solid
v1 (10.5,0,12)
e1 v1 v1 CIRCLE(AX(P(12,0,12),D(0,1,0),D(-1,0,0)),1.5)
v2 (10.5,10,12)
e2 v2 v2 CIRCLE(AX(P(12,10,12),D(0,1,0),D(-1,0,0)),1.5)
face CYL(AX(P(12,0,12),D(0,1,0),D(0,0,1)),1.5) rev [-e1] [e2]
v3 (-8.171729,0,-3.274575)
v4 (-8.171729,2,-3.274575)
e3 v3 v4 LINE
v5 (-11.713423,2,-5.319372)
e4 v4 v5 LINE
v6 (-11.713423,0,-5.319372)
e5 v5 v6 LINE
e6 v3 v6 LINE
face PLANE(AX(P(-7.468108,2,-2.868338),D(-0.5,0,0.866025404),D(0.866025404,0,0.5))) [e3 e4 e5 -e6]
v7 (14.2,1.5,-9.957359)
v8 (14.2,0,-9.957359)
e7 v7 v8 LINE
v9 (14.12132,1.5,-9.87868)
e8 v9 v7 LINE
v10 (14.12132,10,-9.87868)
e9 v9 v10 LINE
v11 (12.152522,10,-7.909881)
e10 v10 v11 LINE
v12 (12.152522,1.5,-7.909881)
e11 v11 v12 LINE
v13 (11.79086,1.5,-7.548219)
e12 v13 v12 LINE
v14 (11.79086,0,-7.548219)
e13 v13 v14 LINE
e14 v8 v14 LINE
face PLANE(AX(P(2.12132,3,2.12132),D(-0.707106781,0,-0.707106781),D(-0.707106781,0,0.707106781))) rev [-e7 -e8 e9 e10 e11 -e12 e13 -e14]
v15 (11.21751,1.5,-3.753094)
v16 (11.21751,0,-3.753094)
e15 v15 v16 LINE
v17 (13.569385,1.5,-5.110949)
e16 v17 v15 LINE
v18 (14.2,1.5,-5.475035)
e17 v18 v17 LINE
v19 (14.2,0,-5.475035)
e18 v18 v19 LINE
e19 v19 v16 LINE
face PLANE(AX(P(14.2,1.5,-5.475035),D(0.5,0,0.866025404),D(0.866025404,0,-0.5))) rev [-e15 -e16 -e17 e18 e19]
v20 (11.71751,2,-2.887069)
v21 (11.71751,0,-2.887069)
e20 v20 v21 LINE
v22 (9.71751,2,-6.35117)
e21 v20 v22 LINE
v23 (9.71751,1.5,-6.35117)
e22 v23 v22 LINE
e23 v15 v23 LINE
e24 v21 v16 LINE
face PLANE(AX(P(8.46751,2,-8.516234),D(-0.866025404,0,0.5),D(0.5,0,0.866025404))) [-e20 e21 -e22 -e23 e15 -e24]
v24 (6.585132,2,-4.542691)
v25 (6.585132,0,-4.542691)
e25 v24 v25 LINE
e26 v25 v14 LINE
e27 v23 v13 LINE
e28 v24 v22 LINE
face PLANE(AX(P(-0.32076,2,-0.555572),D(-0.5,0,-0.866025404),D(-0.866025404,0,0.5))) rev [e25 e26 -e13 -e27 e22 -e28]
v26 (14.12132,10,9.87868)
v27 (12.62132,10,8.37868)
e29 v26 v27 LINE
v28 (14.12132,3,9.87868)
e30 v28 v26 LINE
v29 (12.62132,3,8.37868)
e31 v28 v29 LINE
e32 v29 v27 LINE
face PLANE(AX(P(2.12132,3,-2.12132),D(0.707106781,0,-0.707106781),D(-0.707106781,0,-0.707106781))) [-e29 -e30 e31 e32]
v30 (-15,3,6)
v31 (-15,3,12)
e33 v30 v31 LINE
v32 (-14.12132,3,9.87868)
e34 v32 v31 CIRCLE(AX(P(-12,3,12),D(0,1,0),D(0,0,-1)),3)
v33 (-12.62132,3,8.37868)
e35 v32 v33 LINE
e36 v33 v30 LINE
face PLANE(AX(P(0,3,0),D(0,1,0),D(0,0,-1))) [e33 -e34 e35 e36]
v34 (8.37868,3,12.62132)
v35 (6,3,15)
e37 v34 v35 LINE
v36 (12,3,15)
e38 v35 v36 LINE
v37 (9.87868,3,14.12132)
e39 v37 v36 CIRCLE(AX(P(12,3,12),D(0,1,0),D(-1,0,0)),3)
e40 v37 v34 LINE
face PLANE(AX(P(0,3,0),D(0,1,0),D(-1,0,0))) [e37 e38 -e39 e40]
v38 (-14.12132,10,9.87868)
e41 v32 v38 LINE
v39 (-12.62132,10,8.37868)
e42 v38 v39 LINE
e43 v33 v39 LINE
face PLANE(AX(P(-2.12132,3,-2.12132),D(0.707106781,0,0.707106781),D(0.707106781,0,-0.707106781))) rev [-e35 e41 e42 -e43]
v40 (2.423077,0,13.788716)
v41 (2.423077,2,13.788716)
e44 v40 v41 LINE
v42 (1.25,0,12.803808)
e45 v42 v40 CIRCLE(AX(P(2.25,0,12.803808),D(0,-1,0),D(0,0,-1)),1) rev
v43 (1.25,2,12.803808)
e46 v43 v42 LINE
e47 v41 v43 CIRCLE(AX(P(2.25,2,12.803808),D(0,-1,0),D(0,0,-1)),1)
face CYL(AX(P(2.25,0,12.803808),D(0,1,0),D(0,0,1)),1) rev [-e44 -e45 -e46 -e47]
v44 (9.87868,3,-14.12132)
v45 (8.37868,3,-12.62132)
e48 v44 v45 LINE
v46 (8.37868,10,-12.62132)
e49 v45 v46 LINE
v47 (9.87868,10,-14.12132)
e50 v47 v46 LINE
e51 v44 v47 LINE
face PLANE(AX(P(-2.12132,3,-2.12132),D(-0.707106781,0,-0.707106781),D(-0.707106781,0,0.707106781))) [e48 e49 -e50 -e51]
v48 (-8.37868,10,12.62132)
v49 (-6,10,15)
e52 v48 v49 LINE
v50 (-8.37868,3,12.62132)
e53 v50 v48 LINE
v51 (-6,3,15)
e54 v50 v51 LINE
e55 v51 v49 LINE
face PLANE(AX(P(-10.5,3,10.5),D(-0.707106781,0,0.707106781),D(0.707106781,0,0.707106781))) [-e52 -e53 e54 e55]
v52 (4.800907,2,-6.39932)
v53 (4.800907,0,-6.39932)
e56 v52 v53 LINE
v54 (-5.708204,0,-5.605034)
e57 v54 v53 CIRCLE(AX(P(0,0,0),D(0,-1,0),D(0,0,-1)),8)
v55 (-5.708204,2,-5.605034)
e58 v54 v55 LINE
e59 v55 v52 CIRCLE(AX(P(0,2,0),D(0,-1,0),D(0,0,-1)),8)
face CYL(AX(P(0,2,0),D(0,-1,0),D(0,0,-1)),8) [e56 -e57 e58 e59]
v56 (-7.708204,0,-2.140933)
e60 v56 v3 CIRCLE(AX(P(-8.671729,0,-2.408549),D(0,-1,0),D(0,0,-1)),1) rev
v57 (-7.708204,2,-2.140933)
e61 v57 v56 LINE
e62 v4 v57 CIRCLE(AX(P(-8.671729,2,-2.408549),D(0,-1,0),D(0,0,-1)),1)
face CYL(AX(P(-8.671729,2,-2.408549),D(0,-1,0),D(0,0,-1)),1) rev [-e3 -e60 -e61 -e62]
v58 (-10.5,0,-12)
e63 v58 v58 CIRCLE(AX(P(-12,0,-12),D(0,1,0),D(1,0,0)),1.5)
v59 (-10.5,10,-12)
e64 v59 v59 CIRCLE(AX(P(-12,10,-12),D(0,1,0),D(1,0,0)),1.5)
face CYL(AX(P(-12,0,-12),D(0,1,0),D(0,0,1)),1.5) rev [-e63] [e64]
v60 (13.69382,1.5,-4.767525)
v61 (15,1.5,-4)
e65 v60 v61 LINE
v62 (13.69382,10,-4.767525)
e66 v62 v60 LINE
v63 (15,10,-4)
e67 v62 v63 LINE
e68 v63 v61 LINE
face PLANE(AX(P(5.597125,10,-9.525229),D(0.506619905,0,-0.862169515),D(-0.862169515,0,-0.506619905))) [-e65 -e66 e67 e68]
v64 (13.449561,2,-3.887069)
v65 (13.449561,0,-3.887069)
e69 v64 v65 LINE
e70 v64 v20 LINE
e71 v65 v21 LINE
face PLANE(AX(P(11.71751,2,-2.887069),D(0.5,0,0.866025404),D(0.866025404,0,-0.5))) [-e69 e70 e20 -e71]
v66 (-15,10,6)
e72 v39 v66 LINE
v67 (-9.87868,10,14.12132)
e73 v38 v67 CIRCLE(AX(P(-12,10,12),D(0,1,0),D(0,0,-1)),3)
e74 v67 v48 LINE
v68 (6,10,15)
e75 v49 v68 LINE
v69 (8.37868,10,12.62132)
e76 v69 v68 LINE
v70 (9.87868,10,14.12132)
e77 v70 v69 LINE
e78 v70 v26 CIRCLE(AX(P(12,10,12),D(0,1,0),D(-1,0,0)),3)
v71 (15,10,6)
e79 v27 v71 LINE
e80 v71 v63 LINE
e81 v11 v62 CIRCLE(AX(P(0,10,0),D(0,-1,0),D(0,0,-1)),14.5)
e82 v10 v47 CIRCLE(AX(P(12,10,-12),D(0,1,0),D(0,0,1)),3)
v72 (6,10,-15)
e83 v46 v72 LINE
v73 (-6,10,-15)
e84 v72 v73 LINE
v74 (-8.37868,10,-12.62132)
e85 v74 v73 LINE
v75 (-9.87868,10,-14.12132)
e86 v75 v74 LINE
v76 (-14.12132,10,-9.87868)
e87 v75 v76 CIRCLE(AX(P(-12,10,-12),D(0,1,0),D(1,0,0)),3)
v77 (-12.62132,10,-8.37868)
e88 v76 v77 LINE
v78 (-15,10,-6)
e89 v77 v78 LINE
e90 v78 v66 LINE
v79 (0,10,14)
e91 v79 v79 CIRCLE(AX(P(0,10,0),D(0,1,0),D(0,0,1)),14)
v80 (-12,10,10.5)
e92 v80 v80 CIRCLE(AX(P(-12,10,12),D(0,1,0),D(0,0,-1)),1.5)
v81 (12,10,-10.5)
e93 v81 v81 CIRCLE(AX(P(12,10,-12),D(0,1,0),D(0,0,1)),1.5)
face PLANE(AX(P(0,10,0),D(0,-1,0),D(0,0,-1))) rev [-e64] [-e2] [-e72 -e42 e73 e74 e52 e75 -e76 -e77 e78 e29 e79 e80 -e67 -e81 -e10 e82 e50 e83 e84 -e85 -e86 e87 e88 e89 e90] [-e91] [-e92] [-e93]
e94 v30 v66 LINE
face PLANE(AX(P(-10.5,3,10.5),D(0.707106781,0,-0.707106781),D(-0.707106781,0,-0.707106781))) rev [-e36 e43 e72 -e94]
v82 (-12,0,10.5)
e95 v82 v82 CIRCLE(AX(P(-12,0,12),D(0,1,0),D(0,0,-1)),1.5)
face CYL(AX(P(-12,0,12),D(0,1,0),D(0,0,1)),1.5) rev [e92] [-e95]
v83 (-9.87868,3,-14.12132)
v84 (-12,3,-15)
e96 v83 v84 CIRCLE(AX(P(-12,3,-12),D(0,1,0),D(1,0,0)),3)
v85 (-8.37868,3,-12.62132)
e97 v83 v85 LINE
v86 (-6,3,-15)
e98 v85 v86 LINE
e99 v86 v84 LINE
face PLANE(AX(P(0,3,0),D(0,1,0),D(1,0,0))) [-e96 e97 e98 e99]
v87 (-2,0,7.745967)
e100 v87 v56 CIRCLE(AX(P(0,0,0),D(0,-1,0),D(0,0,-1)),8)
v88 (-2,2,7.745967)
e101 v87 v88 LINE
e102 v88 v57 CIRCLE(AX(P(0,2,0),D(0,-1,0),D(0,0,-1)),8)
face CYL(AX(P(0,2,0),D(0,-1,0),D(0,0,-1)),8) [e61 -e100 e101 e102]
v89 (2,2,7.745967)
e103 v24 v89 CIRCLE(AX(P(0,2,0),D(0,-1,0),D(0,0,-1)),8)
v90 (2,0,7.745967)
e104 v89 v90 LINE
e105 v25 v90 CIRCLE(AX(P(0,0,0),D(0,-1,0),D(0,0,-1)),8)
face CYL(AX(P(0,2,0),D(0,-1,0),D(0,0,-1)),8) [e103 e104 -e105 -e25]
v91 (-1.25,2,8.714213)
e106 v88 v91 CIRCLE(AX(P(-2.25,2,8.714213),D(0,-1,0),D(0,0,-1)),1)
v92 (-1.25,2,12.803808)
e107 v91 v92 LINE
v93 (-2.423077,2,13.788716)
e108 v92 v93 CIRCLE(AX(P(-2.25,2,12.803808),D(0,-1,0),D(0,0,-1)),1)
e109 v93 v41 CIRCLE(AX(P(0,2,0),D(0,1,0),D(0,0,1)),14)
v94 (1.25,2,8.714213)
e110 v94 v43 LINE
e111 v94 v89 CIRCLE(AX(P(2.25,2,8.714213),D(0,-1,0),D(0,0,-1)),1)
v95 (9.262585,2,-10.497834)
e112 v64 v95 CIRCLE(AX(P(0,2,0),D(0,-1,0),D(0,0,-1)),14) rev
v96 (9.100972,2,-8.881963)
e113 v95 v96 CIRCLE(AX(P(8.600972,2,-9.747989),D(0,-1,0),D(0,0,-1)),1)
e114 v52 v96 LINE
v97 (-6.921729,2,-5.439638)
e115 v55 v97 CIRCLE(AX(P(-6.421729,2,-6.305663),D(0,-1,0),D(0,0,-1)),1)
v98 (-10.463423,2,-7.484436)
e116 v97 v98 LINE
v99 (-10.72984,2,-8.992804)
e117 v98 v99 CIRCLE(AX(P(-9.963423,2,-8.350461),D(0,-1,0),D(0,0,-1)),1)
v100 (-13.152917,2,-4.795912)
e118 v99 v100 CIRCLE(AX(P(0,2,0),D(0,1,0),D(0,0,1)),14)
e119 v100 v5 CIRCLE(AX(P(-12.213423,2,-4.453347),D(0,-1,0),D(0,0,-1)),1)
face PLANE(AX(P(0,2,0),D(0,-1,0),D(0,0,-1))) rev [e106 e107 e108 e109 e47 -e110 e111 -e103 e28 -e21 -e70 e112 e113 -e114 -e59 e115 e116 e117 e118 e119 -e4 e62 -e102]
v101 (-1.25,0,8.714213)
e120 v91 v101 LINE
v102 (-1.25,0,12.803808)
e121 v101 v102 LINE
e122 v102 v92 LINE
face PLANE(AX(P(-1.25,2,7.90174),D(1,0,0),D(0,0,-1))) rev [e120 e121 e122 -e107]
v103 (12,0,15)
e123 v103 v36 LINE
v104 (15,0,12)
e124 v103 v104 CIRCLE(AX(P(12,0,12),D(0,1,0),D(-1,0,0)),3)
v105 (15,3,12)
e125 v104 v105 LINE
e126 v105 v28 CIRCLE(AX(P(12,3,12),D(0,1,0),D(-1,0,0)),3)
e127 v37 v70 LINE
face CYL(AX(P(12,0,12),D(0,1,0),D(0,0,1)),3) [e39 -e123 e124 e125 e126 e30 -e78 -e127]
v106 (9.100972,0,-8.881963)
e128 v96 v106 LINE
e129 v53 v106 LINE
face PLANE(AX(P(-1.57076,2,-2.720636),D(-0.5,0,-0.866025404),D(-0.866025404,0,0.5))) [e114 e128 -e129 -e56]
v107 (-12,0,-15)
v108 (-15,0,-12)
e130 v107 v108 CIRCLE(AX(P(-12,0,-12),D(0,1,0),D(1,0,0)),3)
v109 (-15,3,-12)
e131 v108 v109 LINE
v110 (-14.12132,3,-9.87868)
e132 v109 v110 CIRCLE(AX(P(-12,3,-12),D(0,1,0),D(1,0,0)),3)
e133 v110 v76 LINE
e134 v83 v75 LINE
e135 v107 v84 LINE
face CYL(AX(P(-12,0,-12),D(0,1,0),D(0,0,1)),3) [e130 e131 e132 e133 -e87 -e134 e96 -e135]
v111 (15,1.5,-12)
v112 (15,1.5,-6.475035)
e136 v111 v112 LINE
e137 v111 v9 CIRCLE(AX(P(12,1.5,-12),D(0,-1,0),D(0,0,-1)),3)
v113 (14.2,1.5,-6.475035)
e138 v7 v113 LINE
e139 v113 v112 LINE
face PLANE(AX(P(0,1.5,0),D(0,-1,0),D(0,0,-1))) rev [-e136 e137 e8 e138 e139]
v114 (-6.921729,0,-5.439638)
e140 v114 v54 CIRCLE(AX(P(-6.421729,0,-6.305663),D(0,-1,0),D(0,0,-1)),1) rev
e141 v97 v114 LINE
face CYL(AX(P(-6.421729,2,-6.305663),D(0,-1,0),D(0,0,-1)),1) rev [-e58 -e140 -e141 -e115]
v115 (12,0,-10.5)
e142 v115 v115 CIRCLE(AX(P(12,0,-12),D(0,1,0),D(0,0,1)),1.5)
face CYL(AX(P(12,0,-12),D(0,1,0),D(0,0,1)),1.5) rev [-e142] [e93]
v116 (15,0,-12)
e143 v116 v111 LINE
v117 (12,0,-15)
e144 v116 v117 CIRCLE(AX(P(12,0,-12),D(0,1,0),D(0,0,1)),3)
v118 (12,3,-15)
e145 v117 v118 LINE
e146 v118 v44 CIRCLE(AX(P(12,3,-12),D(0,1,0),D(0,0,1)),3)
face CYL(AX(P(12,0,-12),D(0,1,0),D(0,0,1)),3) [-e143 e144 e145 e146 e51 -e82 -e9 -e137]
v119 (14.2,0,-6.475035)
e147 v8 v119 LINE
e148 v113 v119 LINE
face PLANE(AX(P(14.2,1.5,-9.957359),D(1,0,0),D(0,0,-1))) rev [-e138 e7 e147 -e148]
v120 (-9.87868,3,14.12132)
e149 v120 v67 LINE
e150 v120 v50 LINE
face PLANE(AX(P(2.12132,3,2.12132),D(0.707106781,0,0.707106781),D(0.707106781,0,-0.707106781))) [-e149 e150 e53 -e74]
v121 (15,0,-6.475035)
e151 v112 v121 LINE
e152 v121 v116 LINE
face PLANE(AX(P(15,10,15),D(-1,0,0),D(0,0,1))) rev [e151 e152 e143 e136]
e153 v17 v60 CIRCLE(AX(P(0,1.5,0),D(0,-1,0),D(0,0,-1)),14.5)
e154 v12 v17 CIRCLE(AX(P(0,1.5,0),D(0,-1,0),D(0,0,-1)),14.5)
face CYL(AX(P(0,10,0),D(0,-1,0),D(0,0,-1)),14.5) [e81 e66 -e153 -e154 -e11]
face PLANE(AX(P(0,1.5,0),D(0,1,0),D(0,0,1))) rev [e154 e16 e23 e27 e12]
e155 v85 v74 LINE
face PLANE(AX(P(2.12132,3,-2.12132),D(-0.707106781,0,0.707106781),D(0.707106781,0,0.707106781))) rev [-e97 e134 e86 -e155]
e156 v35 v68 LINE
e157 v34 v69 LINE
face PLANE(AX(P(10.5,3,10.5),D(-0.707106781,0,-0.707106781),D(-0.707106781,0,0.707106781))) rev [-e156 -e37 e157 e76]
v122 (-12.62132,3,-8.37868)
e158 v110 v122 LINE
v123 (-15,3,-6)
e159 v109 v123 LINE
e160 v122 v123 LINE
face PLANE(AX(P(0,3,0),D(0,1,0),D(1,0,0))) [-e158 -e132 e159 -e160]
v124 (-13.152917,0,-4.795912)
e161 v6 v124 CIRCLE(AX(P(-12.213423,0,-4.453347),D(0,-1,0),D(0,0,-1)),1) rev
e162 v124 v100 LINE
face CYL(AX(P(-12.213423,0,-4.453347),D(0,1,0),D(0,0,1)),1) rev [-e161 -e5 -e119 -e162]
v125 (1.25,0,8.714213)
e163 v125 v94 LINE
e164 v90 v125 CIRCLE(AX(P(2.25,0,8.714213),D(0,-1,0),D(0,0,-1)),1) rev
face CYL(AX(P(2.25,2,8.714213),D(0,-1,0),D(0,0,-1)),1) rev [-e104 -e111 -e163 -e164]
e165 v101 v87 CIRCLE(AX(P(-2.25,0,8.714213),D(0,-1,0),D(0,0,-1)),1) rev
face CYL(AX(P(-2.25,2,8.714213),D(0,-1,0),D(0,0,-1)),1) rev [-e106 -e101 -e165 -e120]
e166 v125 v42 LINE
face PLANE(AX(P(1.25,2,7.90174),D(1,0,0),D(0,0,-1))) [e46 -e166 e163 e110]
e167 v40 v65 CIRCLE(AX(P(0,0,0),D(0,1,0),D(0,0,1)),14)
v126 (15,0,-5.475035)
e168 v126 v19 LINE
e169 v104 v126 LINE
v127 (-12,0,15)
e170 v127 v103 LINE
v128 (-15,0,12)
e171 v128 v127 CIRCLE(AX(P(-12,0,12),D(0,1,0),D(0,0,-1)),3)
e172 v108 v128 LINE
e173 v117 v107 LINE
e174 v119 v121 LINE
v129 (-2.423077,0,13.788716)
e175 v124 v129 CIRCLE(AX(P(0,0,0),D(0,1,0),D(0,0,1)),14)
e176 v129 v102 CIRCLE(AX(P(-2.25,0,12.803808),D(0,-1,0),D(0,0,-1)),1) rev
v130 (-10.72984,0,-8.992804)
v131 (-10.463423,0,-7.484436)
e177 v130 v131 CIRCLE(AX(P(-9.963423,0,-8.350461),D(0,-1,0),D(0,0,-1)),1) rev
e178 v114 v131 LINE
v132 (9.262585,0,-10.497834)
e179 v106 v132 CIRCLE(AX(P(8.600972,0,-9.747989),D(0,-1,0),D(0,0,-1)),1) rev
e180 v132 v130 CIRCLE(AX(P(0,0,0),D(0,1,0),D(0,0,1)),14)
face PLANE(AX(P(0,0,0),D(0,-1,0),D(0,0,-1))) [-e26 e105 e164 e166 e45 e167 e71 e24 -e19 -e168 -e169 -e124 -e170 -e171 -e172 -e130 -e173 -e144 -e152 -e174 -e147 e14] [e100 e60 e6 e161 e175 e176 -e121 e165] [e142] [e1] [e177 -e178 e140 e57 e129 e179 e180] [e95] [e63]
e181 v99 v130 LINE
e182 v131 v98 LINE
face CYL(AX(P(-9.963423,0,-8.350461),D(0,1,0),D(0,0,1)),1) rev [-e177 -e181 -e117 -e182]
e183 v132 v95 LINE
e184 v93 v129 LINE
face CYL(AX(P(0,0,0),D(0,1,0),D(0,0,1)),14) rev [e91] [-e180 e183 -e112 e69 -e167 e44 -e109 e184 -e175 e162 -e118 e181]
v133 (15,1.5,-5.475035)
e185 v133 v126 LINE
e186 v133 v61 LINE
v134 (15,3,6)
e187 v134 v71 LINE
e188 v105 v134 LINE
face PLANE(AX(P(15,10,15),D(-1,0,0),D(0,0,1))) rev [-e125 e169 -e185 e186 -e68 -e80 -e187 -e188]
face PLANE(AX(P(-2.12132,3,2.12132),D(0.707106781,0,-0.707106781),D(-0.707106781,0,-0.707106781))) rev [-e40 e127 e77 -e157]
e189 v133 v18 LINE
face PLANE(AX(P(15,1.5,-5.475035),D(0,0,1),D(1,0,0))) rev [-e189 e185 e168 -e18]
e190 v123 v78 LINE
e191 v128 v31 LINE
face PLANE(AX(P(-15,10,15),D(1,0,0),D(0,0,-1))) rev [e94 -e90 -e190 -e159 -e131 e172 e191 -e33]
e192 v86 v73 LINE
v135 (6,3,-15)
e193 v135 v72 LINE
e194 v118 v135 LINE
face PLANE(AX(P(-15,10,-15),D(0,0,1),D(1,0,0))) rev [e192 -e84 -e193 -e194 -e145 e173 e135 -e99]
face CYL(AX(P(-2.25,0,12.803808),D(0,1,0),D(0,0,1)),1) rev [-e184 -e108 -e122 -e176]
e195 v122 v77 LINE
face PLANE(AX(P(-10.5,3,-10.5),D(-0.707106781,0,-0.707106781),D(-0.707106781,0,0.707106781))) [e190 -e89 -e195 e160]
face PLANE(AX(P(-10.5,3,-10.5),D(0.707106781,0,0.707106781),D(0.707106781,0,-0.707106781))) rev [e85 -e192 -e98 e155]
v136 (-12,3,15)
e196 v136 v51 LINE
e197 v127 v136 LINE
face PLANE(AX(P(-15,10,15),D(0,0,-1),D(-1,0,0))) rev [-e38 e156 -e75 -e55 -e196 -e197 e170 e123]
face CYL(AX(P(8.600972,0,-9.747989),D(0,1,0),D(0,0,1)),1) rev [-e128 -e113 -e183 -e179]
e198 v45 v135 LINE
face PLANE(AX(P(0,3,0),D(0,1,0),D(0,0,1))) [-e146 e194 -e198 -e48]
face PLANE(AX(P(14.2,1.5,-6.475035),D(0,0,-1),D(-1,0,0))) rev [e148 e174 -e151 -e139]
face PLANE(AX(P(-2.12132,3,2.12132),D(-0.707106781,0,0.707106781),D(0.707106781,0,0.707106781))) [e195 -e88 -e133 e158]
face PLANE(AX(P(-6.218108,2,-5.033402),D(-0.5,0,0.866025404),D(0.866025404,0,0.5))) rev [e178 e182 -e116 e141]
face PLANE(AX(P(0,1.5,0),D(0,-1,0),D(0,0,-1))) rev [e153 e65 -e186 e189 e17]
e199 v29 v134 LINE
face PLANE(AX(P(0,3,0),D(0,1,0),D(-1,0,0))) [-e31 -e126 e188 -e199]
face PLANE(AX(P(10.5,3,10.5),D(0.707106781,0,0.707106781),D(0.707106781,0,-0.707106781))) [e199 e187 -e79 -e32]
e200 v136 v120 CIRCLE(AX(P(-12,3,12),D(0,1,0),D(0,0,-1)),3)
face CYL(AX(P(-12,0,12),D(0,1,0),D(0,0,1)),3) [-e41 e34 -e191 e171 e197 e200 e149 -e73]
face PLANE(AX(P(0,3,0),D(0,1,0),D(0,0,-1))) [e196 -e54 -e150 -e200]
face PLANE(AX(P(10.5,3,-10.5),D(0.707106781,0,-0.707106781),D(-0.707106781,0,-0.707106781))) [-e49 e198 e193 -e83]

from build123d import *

# Parameters (mm, degrees)
SKETCH2_W           = 30
SKETCH2_H           = 30
BOSS_EXTRUDE1_DEPTH = 10
SKETCH3_R           = 1.5
CUT_EXTRUDE1_DEPTH  = 24.452078799
CUT_EXTRUDE5_DEPTH  = 7
CIRPATTERN2_COUNT   = 4
BOSS_EXTRUDE2_START = -2
SKETCH5_R           = 8
BOSS_EXTRUDE2_DEPTH = 2
BOSS_EXTRUDE3_START = -2
BOSS_EXTRUDE3_DEPTH = 2
FILLET1_R           = 1
FILLET2_R           = 1
CUT_EXTRUDE8_DEPTH  = 1.5
CUT_EXTRUDE9_DEPTH  = 23.852789764


with BuildPart() as part:
    # Sketch2 → Boss-Extrude1 (new body)
    with BuildSketch(Plane(origin=(0, 0, 0), x_dir=(1, 0, 0), z_dir=(0, 1, 0))):
        Rectangle(SKETCH2_W, SKETCH2_H)
    extrude(amount=BOSS_EXTRUDE1_DEPTH)

    # Sketch3 → Cut-Extrude1 (cut, through all)
    with BuildSketch(Plane(origin=(0, 10, 0), x_dir=(1, 0, 0), z_dir=(0, 1, 0))):
        with BuildLine():
            ThreePointArc((9.626607334, 10.165059333), (-12.860258603, -5.532969245), (14, 0))
            ThreePointArc((14, 0), (13.005976139, 5.181175993), (10.165059333, 9.626607334))
            ThreePointArc((10.165059333, 9.626607334), (9.878679656, 9.878679656), (9.626607334, 10.165059333))
        make_face()
        with BuildLine():
            Line((15, 15), (12, 15))
            ThreePointArc((12, 15), (14.121320344, 14.121320344), (15, 12))
            Line((15, 12), (15, 15))
        make_face()
        with Locations(Location((12, 12, 0), (0, 0, 270))):
            Circle(SKETCH3_R)
    cut_extrude1 = extrude(amount=-CUT_EXTRUDE1_DEPTH, mode=Mode.SUBTRACT)

    # Sketch3<3> → Cut-Extrude5 (cut)
    with BuildSketch(Plane(origin=(0, 10, 0), x_dir=(1, 0, 0), z_dir=(0, 1, 0))):
        with BuildLine():
            Line((15, 6), (15, 12))
            ThreePointArc((15, 12), (14.771638598, 10.851949703), (14.121320344, 9.878679656))
            Line((14.121320344, 9.878679656), (12.621320344, 8.378679656))
            Line((12.621320344, 8.378679656), (15, 6))
        make_face()
        with BuildLine():
            Line((8.378679656, 12.621320344), (9.878679656, 14.121320344))
            ThreePointArc((9.878679656, 14.121320344), (10.851949703, 14.771638598), (12, 15))
            Line((12, 15), (6, 15))
            Line((6, 15), (8.378679656, 12.621320344))
        make_face()
    cut_extrude5 = extrude(amount=-CUT_EXTRUDE5_DEPTH, mode=Mode.SUBTRACT)

    # CirPattern2: Cut-Extrude1, Cut-Extrude5 ×4 about axis
    cirpattern2_axis = Axis((0, 0, 0), (0, 1, 0))
    add([cut_extrude1.rotate(cirpattern2_axis, i * 360 / CIRPATTERN2_COUNT) for i in range(1, CIRPATTERN2_COUNT)], mode=Mode.SUBTRACT)
    add([cut_extrude5.rotate(cirpattern2_axis, i * 360 / CIRPATTERN2_COUNT) for i in range(1, CIRPATTERN2_COUNT)], mode=Mode.SUBTRACT)

    # Sketch5 → Boss-Extrude2 (add)
    with BuildSketch(Plane.XZ.offset(BOSS_EXTRUDE2_START)):
        Circle(SKETCH5_R)
        with BuildLine():
            Line((-1.25, 7.901740315), (-1.25, 13.944084767))
            ThreePointArc((-1.25, 13.944084767), (0, 14), (1.25, 13.944084767))
            Line((1.25, 13.944084767), (1.25, 7.901740315))
            Line((1.25, 7.901740315), (-1.25, 7.901740315))
        make_face()
        with BuildLine():
            Line((-6.218107847, -5.033401912), (-11.450931641, -8.054574138))
            ThreePointArc((-11.450931641, -8.054574138), (-12.124355653, -7), (-12.700931641, -5.889510629))
            Line((-12.700931641, -5.889510629), (-7.468107847, -2.868338403))
            Line((-7.468107847, -2.868338403), (-6.218107847, -5.033401912))
        make_face()
        with BuildLine():
            Line((4.800907132, -6.399319551), (10.244405826, -9.542124987))
            ThreePointArc((10.244405826, -9.542124987), (11.062646674, -8.580084415), (11.790860146, -7.548219459))
            Line((11.790860146, -7.548219459), (6.585131773, -4.542690781))
            Line((6.585131773, -4.542690781), (4.800907132, -6.399319551))
        make_face()
    extrude(amount=BOSS_EXTRUDE2_DEPTH)

    # Sketch13 → Boss-Extrude3 (add)
    with BuildSketch(Plane.XZ.offset(BOSS_EXTRUDE3_START)):
        with BuildLine():
            Line((8.467510381, -8.516233923), (11.717510381, -2.887068799))
            Line((11.717510381, -2.887068799), (13.449561188, -3.887068799))
            ThreePointArc((13.449561188, -3.887068799), (12.179734535, -6.903192498), (10.244405826, -9.542124987))
            Line((10.244405826, -9.542124987), (8.467510381, -8.516233923))
        make_face()
    extrude(amount=BOSS_EXTRUDE3_DEPTH)

    # Fillet1
    # the kernel refuses this fillet: 1 mm, written as the material it adds along each edge
    with BuildSketch(Plane(origin=(10.244405826, 2, -9.542124987), x_dir=(-0.716571272890301, 0, -0.6975138786206146), z_dir=(0, -1, 0))) as fillet1_piece_1:
        with BuildLine():
            CenterArc((1.321230175, -0.998801992), FILLET1_R, 87.19514232, 108.576976785)
            Line((0.3588798, -1.270613979), (0, 0))
            ThreePointArc((0, 0), (0.685082313, 0.01677211), (1.370164625, 0))
        make_face()
    extrude(amount=2)
    with BuildSketch(Plane(origin=(-1.25, 2, 13.944084767), x_dir=(0, 0, -1), z_dir=(0, -1, 0)), Plane(origin=(-11.450931641, 2, -8.054574138), x_dir=(0.8660254037844306, 0, 0.5000000000000138), z_dir=(0, -1, 0))) as fillet1_piece_2:
        with BuildLine():
            CenterArc((1.14027674, -1), FILLET1_R, 90, 99.9667663)
            ThreePointArc((0.15536843, -1.173076923), (0.065284688, -0.58818072), (0, 0))
            Line((0, 0), (1.14027674, 0))
        make_face()
    extrude(amount=2)
    with BuildSketch(Plane(origin=(-12.700931641, 2, -5.889510629), x_dir=(0.8660254037844369, 0, 0.5000000000000029), z_dir=(0, -1, 0)), Plane(origin=(1.25, 2, 13.944084767), x_dir=(0, 0, -1), z_dir=(0, -1, 0))) as fillet1_piece_3:
        with BuildLine():
            CenterArc((1.14027674, 1), FILLET1_R, 170.0332337, 99.9667663)
            ThreePointArc((0.15536843, 1.173076923), (0.065284688, 0.58818072), (0, 0))
            Line((0, 0), (1.14027674, 0))
        make_face()
    extrude(amount=2)

    # Fillet2
    fillet2_edges = [part.edges().sort_by_distance(p)[0] for p in [
        (-7.468107847, 1, -2.868338403),
        (1.25, 1, 7.901740315),
        (-1.25, 1, 7.901740315),
        (-6.218107847, 1, -5.033401912),
    ]]
    fillet(fillet2_edges, radius=FILLET2_R)

    # Sketch9 → Cut-Extrude8 (cut)
    with BuildSketch(Plane.XZ):
        Polygon((9.717510381, -6.351170414), (11.790860146, -7.548219459), (12.621320344, -8.378679656), (14.121320344, -9.878679656), (14.2, -9.957359313), (14.2, -6.475035387), (15, -6.475035387), (15, -5.475035387), (14.2, -5.475035387), (11.217510381, -3.753094203), align=None)
    extrude(amount=-CUT_EXTRUDE8_DEPTH, mode=Mode.SUBTRACT)

    # Sketch10 → Cut-Extrude9 (cut, through all)
    with BuildSketch(Plane.XZ.offset(-1.5)):
        with BuildLine():
            ThreePointArc((13.569384529, -5.110949375), (12.93687053, -6.548845767), (12.152521667, -7.90988098))
            Line((12.152521667, -7.90988098), (14.121320344, -9.878679656))
            Line((14.121320344, -9.878679656), (14.2, -9.957359313))
            Line((14.2, -9.957359313), (14.2, -6.475035387))
            Line((14.2, -6.475035387), (15, -6.475035387))
            Line((15, -6.475035387), (15, -5.475035387))
            Line((15, -5.475035387), (14.2, -5.475035387))
            Line((14.2, -5.475035387), (13.569384529, -5.110949375))
        make_face()
        with BuildLine():
            ThreePointArc((13.693819896, -4.767525213), (13.632683665, -4.939629144), (13.569384529, -5.110949375))
            Line((13.569384529, -5.110949375), (14.2, -5.475035387))
            Line((14.2, -5.475035387), (15, -5.475035387))
            Line((15, -5.475035387), (15, -4))
            Line((15, -4), (13.693819896, -4.767525213))
        make_face()
        with BuildLine():
            Line((14.2, -9.957359313), (14.121320344, -9.878679656))
            ThreePointArc((14.121320344, -9.878679656), (14.771638598, -10.851949703), (15, -12))
            Line((15, -12), (15, -6.475035387))
            Line((15, -6.475035387), (14.2, -6.475035387))
            Line((14.2, -6.475035387), (14.2, -9.957359313))
        make_face()
    extrude(amount=-CUT_EXTRUDE9_DEPTH, mode=Mode.SUBTRACT)


solid = part.part
